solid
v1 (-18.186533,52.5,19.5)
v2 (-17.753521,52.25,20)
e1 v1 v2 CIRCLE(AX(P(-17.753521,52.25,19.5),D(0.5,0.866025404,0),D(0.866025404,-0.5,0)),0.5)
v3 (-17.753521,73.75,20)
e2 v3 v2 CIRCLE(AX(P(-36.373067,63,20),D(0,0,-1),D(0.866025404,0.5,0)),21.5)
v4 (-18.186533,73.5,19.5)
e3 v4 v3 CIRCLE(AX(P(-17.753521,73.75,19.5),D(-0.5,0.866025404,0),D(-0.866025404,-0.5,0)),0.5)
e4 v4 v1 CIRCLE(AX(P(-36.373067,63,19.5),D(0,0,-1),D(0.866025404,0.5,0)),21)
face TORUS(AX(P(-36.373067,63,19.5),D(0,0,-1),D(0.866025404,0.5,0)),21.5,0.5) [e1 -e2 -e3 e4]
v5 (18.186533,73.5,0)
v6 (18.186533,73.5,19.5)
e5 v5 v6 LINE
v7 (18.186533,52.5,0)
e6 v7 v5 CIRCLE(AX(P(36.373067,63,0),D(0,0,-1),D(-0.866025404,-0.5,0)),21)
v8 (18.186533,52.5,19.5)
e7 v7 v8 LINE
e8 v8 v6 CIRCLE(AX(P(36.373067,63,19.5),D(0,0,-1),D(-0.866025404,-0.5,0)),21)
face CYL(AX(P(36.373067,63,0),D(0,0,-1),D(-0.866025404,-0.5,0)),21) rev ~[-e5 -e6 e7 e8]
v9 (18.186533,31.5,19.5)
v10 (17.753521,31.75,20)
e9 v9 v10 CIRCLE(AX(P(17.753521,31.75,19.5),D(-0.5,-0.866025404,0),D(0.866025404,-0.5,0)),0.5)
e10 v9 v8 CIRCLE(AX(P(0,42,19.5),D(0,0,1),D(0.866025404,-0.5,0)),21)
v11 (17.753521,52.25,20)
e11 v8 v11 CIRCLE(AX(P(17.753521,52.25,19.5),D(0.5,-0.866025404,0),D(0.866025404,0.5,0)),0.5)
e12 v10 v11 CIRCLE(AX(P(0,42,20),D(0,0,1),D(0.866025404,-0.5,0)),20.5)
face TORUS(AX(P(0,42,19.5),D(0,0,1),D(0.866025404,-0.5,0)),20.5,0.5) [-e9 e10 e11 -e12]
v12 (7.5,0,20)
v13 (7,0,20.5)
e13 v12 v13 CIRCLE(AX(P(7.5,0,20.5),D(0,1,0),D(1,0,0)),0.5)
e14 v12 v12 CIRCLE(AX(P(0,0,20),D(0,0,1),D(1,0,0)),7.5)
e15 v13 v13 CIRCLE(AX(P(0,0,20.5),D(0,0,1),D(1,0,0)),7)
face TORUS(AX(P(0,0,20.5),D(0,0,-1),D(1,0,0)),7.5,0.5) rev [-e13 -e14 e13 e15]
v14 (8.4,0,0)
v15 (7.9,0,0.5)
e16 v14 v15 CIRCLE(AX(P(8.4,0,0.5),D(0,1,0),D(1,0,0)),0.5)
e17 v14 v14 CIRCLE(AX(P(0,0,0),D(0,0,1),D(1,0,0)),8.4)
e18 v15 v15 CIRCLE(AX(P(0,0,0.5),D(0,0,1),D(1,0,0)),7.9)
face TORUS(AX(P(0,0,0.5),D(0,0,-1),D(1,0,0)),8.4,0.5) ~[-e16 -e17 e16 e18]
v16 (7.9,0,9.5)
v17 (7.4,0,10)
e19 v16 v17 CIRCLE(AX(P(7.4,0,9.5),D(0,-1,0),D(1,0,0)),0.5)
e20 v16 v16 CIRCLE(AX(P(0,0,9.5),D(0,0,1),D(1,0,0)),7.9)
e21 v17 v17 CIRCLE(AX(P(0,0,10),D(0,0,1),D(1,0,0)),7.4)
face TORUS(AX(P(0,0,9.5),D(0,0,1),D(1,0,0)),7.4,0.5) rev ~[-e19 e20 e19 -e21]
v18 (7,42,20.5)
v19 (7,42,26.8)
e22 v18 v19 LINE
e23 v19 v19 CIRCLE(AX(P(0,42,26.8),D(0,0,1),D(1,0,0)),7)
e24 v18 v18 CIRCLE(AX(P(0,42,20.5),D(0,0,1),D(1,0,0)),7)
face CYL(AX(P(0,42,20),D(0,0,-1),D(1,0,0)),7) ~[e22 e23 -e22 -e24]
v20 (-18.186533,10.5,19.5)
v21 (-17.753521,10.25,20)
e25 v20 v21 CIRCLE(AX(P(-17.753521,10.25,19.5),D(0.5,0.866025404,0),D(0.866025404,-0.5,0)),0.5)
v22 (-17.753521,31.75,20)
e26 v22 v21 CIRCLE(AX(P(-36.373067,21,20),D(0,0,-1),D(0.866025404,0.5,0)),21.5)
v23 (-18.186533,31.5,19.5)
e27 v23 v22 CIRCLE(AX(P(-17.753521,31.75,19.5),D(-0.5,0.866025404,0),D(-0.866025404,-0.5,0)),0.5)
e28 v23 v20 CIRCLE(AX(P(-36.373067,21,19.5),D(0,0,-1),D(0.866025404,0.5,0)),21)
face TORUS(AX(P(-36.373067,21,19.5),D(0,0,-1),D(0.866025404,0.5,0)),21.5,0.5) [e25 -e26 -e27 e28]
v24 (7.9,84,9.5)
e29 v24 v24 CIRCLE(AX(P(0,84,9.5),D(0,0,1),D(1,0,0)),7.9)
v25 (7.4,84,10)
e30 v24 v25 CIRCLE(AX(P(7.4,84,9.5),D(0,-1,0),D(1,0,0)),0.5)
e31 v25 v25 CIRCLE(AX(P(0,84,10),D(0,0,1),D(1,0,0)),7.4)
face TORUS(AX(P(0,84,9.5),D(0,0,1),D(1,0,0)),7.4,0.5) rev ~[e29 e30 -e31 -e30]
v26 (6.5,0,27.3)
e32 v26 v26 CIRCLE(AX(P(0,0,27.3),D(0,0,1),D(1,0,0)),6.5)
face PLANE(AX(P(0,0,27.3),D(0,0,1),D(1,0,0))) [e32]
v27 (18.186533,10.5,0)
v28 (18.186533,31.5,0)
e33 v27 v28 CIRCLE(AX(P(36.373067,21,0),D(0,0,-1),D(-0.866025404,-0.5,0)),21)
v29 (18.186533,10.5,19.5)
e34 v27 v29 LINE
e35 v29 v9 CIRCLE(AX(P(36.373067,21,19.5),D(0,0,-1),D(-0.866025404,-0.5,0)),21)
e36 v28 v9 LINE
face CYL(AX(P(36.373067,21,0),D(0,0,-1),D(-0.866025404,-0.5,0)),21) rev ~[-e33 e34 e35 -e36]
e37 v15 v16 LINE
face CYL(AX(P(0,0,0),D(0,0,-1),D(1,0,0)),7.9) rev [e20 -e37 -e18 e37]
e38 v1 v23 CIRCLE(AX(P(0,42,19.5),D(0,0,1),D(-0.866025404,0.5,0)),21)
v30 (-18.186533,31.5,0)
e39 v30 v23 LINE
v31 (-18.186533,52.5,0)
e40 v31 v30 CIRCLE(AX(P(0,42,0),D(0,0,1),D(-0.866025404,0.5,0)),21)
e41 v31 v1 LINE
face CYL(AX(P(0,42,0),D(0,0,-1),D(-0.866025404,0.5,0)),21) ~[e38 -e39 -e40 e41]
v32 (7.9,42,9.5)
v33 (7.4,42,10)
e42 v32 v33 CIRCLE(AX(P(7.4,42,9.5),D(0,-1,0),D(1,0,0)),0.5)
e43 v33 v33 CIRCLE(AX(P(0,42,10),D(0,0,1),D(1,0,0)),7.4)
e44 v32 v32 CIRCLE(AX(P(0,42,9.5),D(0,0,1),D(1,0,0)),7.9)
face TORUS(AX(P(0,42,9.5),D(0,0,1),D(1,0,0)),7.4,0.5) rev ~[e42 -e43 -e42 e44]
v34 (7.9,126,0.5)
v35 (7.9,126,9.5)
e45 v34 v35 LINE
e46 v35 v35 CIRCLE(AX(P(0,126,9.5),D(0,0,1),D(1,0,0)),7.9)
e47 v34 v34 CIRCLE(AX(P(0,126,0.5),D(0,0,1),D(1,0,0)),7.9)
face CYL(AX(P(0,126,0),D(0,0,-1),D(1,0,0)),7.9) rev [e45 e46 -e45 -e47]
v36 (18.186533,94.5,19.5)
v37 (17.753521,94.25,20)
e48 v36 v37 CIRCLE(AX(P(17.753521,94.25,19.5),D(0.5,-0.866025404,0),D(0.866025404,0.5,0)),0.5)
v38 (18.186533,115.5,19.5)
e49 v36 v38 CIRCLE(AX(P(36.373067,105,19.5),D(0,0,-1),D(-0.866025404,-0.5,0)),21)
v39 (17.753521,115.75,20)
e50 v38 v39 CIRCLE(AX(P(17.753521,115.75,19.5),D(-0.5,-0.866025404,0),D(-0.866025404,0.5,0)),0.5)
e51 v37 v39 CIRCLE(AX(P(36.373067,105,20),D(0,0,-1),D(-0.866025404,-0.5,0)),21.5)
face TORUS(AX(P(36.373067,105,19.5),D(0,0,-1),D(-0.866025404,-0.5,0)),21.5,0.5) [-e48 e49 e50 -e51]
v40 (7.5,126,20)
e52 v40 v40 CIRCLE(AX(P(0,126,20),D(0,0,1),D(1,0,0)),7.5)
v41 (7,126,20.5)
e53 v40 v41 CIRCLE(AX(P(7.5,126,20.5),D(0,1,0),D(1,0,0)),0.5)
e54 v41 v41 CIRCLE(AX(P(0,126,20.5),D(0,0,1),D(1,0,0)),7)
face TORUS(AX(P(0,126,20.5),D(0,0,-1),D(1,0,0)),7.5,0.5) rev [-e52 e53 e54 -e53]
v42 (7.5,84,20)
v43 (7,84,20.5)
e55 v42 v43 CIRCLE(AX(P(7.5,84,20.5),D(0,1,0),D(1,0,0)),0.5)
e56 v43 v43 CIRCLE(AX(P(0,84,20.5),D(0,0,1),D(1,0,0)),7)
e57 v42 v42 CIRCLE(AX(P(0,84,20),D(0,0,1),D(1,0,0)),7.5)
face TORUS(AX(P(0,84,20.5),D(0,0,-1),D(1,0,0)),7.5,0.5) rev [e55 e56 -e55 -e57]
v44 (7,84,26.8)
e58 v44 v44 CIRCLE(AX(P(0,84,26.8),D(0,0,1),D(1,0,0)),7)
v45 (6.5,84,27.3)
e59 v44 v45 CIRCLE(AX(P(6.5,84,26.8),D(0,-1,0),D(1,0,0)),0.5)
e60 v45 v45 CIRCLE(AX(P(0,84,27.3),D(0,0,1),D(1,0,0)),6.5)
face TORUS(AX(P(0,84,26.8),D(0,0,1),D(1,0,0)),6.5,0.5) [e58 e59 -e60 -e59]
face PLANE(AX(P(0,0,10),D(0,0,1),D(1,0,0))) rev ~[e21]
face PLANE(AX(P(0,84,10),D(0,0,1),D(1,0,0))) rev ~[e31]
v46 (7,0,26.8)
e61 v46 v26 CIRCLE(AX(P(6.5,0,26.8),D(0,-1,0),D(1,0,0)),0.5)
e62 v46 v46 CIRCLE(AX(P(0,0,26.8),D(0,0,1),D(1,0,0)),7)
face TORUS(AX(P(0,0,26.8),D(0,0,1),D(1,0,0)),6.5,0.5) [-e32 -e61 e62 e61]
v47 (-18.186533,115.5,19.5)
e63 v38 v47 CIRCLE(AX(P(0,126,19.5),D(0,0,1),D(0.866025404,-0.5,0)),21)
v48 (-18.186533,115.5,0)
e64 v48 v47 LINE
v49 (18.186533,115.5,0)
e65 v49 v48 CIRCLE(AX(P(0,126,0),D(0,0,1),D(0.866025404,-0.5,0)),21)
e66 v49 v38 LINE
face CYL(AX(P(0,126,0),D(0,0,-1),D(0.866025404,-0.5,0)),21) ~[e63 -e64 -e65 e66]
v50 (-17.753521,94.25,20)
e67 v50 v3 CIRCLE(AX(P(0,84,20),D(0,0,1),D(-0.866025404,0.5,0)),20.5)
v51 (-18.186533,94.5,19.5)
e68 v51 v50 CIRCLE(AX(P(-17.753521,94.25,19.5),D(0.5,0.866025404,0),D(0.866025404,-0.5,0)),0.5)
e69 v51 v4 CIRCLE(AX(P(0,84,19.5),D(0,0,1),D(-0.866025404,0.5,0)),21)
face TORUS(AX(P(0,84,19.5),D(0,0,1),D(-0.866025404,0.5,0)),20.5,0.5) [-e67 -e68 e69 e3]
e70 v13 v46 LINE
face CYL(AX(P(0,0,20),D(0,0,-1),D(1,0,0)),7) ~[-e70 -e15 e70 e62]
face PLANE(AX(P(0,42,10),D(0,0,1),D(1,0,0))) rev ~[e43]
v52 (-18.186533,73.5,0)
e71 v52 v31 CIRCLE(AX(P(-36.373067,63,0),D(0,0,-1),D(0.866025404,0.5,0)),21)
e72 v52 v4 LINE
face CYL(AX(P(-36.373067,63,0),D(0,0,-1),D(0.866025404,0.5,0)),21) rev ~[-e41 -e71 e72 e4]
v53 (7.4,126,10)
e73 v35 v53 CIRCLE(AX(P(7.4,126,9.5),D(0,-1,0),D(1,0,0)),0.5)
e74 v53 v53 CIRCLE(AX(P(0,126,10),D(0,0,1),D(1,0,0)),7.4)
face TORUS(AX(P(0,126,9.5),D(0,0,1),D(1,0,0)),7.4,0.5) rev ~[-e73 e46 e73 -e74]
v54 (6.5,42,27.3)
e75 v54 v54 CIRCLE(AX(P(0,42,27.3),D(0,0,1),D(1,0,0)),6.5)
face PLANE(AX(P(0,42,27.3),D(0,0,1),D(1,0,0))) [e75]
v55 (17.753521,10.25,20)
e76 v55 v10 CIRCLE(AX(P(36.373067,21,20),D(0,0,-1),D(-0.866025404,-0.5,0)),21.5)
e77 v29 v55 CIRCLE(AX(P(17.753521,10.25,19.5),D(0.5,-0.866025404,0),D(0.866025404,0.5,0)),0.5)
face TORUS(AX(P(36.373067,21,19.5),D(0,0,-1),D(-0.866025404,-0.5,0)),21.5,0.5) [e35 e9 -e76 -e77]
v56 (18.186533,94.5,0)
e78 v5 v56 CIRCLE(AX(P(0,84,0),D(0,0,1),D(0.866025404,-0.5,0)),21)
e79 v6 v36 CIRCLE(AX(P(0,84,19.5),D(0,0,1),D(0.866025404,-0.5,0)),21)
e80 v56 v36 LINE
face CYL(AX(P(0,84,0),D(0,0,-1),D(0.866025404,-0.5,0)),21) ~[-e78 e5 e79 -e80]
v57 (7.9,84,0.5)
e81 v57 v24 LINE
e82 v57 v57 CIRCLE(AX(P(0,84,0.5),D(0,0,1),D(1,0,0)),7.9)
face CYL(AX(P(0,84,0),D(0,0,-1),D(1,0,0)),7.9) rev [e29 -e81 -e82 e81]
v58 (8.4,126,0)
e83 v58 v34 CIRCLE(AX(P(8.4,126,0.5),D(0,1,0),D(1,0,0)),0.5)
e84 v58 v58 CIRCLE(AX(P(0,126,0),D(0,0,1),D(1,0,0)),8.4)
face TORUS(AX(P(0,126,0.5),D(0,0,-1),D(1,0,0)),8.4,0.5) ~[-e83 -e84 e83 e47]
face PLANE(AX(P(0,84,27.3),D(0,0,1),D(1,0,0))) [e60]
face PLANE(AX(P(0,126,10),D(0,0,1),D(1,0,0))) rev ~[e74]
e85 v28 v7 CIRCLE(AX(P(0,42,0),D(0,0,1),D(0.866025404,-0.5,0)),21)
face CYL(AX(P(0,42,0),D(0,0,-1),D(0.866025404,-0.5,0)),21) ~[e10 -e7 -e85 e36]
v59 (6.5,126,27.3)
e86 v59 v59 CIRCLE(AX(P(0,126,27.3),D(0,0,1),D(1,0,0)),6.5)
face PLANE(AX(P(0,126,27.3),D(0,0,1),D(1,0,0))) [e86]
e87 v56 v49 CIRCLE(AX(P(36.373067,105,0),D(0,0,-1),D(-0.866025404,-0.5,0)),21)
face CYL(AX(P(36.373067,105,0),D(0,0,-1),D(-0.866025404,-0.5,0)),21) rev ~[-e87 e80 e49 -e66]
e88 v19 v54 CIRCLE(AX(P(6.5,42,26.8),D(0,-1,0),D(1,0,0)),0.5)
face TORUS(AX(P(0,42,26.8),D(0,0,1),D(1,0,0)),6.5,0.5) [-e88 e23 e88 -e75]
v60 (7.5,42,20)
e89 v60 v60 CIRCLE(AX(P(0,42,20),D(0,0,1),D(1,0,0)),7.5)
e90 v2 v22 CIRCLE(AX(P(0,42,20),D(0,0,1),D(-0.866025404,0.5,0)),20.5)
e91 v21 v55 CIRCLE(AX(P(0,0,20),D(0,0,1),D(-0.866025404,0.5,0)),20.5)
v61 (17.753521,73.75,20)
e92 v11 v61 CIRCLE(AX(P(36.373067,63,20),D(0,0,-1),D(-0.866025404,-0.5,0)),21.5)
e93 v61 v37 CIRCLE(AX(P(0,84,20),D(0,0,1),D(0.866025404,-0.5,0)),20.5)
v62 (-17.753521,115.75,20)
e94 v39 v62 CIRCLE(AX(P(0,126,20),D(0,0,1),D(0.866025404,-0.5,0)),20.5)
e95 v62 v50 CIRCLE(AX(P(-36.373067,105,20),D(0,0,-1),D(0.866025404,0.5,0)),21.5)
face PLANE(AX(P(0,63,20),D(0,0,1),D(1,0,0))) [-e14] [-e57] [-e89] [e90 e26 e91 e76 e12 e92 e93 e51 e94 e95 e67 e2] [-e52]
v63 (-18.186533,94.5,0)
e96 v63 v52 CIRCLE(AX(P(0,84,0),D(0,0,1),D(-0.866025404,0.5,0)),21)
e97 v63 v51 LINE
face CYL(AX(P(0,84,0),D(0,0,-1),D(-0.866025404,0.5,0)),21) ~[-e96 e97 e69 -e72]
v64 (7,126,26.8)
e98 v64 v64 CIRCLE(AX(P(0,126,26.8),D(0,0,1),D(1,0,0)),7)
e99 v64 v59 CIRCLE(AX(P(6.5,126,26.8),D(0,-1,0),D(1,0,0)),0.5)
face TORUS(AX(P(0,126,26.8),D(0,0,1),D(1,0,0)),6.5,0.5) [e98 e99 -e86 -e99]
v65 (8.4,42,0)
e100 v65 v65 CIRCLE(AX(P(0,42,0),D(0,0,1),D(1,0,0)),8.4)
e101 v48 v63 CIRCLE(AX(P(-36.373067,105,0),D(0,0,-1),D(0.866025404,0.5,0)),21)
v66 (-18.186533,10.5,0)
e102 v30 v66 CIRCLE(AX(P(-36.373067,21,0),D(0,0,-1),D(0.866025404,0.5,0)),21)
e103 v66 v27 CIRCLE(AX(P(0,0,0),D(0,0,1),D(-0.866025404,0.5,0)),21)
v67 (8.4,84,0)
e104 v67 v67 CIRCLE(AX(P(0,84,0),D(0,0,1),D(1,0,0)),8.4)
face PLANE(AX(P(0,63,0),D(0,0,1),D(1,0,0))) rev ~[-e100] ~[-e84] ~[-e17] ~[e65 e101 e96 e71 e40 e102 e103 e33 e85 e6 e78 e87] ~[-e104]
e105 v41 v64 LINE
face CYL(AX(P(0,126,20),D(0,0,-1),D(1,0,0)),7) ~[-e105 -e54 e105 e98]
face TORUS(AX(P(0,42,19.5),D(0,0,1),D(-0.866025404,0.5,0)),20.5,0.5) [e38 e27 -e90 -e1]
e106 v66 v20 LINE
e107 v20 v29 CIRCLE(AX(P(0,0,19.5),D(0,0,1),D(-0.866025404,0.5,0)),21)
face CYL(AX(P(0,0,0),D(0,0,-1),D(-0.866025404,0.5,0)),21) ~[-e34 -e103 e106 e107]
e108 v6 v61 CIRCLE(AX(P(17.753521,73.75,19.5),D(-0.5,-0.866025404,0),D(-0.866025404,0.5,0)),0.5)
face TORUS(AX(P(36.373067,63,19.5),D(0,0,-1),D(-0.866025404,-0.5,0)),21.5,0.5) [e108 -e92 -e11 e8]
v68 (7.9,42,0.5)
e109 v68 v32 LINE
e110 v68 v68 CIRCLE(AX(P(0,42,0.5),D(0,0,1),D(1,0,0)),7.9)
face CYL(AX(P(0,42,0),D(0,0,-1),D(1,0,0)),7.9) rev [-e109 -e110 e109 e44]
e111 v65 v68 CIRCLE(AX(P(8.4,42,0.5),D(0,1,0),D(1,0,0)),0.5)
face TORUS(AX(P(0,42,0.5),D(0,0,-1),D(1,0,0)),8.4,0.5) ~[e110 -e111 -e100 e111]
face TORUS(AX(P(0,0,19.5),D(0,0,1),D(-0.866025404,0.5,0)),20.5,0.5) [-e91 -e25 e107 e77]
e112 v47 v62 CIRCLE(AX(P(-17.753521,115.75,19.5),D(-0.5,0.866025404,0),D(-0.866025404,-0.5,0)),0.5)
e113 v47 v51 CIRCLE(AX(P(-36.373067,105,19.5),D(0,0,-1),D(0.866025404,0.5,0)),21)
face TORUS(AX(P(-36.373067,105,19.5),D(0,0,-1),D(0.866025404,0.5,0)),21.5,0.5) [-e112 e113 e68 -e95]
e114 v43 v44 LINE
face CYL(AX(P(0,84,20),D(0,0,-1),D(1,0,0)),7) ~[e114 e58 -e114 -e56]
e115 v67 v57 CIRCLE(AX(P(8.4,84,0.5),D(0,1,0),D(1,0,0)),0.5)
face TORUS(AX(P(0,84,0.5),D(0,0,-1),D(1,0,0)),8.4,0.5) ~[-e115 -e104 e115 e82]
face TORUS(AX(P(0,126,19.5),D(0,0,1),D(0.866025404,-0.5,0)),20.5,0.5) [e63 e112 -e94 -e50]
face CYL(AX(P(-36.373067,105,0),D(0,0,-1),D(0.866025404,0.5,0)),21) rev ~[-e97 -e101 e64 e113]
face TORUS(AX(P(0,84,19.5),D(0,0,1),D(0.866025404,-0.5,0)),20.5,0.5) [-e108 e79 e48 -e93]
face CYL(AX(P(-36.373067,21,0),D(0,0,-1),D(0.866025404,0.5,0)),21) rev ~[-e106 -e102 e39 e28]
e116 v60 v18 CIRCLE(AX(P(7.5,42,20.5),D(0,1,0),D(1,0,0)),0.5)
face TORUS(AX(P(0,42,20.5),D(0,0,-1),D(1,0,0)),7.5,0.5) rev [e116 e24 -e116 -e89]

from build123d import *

# Parameters (mm, degrees)
F4_R     = 7.9
F5_DEPTH = 20
F6_DEPTH = 10
F7_R     = 7
F8_DEPTH = 7.3
F9_R     = 0.5


# Not quite as in the source:
# - a feature names something its author has since deleted; it is built from what else it names


with BuildPart() as f5:
    # F4 (on Top) → F5 (new body)
    with BuildSketch(Plane.XY):
        with BuildLine():
            ThreePointArc((18.1865334795, 10.5), (15.3730669589, 21), (18.1865334795, 31.5))
            ThreePointArc((18.1865334795, 31.5), (21, 42), (18.1865334795, 52.5))
            ThreePointArc((18.1865334795, 52.5), (15.3730669589, 63), (18.1865334795, 73.5))
            ThreePointArc((18.1865334795, 73.5), (21, 84), (18.1865334795, 94.5))
            ThreePointArc((18.1865334795, 94.5), (15.3730669589, 105), (18.1865334795, 115.5))
            ThreePointArc((18.1865334795, 115.5), (0, 147), (-18.1865334795, 115.5))
            ThreePointArc((-18.1865334795, 115.5), (-15.3730669589, 105), (-18.1865334795, 94.5))
            ThreePointArc((-18.1865334795, 94.5), (-21, 84), (-18.1865334795, 73.5))
            ThreePointArc((-18.1865334795, 73.5), (-15.3730669589, 63), (-18.1865334795, 52.5))
            ThreePointArc((-18.1865334795, 52.5), (-21, 42), (-18.1865334795, 31.5))
            ThreePointArc((-18.1865334795, 31.5), (-15.3730669589, 21), (-18.1865334795, 10.5))
            ThreePointArc((-18.1865334795, 10.5), (0, -21), (18.1865334795, 10.5))
        make_face()
        Circle(F4_R, mode=Mode.SUBTRACT)
        with Locations((0, 42)):
            Circle(F4_R, mode=Mode.SUBTRACT)
        with Locations((0, 84)):
            Circle(F4_R, mode=Mode.SUBTRACT)
        with Locations((0, 126)):
            Circle(F4_R, mode=Mode.SUBTRACT)
        with Locations((0, 42)):
            Circle(F4_R)
        Circle(F4_R)
        with Locations((0, 126)):
            Circle(F4_R)
        with Locations((0, 84)):
            Circle(F4_R)
    extrude(amount=F5_DEPTH)

    # F4 (on Top) → F6 (cut)
    with BuildSketch(Plane.XY):
        with Locations((0, 42)):
            Circle(F4_R)
        Circle(F4_R)
        with Locations((0, 84)):
            Circle(F4_R)
        with Locations((0, 126)):
            Circle(F4_R)
    extrude(amount=F6_DEPTH, mode=Mode.SUBTRACT)

    # F7 (on face) → F8 (join)
    with BuildSketch(Plane.XY.offset(20)):
        Circle(F7_R)
        with Locations((0, 42)):
            Circle(F7_R)
        with Locations((0, 84)):
            Circle(F7_R)
        with Locations((0, 126)):
            Circle(F7_R)
    extrude(amount=F8_DEPTH)

    # F9
    f9_edges = [f5.edges().sort_by_distance(p)[0] for p in [
        (-7, 0, 27.3),
        (-7.9, 42, 0),
        (-7.9, 42, 10),
        (-7.9, 0, 0),
        (-7.9, 0, 10),
        (-7, 42, 27.3),
        (-7, 42, 20),
        (21, 42, 20),
        (-7, 84, 27.3),
        (-7, 84, 20),
        (-7, 126, 27.3),
        (-7, 126, 20),
        (-7.9, 84, 10),
        (-7.9, 84, 0),
        (-7.9, 126, 10),
        (-7.9, 126, 0),
        (-7, 0, 20),
    ]]
    fillet(f9_edges, radius=F9_R)


solid = f5.part
